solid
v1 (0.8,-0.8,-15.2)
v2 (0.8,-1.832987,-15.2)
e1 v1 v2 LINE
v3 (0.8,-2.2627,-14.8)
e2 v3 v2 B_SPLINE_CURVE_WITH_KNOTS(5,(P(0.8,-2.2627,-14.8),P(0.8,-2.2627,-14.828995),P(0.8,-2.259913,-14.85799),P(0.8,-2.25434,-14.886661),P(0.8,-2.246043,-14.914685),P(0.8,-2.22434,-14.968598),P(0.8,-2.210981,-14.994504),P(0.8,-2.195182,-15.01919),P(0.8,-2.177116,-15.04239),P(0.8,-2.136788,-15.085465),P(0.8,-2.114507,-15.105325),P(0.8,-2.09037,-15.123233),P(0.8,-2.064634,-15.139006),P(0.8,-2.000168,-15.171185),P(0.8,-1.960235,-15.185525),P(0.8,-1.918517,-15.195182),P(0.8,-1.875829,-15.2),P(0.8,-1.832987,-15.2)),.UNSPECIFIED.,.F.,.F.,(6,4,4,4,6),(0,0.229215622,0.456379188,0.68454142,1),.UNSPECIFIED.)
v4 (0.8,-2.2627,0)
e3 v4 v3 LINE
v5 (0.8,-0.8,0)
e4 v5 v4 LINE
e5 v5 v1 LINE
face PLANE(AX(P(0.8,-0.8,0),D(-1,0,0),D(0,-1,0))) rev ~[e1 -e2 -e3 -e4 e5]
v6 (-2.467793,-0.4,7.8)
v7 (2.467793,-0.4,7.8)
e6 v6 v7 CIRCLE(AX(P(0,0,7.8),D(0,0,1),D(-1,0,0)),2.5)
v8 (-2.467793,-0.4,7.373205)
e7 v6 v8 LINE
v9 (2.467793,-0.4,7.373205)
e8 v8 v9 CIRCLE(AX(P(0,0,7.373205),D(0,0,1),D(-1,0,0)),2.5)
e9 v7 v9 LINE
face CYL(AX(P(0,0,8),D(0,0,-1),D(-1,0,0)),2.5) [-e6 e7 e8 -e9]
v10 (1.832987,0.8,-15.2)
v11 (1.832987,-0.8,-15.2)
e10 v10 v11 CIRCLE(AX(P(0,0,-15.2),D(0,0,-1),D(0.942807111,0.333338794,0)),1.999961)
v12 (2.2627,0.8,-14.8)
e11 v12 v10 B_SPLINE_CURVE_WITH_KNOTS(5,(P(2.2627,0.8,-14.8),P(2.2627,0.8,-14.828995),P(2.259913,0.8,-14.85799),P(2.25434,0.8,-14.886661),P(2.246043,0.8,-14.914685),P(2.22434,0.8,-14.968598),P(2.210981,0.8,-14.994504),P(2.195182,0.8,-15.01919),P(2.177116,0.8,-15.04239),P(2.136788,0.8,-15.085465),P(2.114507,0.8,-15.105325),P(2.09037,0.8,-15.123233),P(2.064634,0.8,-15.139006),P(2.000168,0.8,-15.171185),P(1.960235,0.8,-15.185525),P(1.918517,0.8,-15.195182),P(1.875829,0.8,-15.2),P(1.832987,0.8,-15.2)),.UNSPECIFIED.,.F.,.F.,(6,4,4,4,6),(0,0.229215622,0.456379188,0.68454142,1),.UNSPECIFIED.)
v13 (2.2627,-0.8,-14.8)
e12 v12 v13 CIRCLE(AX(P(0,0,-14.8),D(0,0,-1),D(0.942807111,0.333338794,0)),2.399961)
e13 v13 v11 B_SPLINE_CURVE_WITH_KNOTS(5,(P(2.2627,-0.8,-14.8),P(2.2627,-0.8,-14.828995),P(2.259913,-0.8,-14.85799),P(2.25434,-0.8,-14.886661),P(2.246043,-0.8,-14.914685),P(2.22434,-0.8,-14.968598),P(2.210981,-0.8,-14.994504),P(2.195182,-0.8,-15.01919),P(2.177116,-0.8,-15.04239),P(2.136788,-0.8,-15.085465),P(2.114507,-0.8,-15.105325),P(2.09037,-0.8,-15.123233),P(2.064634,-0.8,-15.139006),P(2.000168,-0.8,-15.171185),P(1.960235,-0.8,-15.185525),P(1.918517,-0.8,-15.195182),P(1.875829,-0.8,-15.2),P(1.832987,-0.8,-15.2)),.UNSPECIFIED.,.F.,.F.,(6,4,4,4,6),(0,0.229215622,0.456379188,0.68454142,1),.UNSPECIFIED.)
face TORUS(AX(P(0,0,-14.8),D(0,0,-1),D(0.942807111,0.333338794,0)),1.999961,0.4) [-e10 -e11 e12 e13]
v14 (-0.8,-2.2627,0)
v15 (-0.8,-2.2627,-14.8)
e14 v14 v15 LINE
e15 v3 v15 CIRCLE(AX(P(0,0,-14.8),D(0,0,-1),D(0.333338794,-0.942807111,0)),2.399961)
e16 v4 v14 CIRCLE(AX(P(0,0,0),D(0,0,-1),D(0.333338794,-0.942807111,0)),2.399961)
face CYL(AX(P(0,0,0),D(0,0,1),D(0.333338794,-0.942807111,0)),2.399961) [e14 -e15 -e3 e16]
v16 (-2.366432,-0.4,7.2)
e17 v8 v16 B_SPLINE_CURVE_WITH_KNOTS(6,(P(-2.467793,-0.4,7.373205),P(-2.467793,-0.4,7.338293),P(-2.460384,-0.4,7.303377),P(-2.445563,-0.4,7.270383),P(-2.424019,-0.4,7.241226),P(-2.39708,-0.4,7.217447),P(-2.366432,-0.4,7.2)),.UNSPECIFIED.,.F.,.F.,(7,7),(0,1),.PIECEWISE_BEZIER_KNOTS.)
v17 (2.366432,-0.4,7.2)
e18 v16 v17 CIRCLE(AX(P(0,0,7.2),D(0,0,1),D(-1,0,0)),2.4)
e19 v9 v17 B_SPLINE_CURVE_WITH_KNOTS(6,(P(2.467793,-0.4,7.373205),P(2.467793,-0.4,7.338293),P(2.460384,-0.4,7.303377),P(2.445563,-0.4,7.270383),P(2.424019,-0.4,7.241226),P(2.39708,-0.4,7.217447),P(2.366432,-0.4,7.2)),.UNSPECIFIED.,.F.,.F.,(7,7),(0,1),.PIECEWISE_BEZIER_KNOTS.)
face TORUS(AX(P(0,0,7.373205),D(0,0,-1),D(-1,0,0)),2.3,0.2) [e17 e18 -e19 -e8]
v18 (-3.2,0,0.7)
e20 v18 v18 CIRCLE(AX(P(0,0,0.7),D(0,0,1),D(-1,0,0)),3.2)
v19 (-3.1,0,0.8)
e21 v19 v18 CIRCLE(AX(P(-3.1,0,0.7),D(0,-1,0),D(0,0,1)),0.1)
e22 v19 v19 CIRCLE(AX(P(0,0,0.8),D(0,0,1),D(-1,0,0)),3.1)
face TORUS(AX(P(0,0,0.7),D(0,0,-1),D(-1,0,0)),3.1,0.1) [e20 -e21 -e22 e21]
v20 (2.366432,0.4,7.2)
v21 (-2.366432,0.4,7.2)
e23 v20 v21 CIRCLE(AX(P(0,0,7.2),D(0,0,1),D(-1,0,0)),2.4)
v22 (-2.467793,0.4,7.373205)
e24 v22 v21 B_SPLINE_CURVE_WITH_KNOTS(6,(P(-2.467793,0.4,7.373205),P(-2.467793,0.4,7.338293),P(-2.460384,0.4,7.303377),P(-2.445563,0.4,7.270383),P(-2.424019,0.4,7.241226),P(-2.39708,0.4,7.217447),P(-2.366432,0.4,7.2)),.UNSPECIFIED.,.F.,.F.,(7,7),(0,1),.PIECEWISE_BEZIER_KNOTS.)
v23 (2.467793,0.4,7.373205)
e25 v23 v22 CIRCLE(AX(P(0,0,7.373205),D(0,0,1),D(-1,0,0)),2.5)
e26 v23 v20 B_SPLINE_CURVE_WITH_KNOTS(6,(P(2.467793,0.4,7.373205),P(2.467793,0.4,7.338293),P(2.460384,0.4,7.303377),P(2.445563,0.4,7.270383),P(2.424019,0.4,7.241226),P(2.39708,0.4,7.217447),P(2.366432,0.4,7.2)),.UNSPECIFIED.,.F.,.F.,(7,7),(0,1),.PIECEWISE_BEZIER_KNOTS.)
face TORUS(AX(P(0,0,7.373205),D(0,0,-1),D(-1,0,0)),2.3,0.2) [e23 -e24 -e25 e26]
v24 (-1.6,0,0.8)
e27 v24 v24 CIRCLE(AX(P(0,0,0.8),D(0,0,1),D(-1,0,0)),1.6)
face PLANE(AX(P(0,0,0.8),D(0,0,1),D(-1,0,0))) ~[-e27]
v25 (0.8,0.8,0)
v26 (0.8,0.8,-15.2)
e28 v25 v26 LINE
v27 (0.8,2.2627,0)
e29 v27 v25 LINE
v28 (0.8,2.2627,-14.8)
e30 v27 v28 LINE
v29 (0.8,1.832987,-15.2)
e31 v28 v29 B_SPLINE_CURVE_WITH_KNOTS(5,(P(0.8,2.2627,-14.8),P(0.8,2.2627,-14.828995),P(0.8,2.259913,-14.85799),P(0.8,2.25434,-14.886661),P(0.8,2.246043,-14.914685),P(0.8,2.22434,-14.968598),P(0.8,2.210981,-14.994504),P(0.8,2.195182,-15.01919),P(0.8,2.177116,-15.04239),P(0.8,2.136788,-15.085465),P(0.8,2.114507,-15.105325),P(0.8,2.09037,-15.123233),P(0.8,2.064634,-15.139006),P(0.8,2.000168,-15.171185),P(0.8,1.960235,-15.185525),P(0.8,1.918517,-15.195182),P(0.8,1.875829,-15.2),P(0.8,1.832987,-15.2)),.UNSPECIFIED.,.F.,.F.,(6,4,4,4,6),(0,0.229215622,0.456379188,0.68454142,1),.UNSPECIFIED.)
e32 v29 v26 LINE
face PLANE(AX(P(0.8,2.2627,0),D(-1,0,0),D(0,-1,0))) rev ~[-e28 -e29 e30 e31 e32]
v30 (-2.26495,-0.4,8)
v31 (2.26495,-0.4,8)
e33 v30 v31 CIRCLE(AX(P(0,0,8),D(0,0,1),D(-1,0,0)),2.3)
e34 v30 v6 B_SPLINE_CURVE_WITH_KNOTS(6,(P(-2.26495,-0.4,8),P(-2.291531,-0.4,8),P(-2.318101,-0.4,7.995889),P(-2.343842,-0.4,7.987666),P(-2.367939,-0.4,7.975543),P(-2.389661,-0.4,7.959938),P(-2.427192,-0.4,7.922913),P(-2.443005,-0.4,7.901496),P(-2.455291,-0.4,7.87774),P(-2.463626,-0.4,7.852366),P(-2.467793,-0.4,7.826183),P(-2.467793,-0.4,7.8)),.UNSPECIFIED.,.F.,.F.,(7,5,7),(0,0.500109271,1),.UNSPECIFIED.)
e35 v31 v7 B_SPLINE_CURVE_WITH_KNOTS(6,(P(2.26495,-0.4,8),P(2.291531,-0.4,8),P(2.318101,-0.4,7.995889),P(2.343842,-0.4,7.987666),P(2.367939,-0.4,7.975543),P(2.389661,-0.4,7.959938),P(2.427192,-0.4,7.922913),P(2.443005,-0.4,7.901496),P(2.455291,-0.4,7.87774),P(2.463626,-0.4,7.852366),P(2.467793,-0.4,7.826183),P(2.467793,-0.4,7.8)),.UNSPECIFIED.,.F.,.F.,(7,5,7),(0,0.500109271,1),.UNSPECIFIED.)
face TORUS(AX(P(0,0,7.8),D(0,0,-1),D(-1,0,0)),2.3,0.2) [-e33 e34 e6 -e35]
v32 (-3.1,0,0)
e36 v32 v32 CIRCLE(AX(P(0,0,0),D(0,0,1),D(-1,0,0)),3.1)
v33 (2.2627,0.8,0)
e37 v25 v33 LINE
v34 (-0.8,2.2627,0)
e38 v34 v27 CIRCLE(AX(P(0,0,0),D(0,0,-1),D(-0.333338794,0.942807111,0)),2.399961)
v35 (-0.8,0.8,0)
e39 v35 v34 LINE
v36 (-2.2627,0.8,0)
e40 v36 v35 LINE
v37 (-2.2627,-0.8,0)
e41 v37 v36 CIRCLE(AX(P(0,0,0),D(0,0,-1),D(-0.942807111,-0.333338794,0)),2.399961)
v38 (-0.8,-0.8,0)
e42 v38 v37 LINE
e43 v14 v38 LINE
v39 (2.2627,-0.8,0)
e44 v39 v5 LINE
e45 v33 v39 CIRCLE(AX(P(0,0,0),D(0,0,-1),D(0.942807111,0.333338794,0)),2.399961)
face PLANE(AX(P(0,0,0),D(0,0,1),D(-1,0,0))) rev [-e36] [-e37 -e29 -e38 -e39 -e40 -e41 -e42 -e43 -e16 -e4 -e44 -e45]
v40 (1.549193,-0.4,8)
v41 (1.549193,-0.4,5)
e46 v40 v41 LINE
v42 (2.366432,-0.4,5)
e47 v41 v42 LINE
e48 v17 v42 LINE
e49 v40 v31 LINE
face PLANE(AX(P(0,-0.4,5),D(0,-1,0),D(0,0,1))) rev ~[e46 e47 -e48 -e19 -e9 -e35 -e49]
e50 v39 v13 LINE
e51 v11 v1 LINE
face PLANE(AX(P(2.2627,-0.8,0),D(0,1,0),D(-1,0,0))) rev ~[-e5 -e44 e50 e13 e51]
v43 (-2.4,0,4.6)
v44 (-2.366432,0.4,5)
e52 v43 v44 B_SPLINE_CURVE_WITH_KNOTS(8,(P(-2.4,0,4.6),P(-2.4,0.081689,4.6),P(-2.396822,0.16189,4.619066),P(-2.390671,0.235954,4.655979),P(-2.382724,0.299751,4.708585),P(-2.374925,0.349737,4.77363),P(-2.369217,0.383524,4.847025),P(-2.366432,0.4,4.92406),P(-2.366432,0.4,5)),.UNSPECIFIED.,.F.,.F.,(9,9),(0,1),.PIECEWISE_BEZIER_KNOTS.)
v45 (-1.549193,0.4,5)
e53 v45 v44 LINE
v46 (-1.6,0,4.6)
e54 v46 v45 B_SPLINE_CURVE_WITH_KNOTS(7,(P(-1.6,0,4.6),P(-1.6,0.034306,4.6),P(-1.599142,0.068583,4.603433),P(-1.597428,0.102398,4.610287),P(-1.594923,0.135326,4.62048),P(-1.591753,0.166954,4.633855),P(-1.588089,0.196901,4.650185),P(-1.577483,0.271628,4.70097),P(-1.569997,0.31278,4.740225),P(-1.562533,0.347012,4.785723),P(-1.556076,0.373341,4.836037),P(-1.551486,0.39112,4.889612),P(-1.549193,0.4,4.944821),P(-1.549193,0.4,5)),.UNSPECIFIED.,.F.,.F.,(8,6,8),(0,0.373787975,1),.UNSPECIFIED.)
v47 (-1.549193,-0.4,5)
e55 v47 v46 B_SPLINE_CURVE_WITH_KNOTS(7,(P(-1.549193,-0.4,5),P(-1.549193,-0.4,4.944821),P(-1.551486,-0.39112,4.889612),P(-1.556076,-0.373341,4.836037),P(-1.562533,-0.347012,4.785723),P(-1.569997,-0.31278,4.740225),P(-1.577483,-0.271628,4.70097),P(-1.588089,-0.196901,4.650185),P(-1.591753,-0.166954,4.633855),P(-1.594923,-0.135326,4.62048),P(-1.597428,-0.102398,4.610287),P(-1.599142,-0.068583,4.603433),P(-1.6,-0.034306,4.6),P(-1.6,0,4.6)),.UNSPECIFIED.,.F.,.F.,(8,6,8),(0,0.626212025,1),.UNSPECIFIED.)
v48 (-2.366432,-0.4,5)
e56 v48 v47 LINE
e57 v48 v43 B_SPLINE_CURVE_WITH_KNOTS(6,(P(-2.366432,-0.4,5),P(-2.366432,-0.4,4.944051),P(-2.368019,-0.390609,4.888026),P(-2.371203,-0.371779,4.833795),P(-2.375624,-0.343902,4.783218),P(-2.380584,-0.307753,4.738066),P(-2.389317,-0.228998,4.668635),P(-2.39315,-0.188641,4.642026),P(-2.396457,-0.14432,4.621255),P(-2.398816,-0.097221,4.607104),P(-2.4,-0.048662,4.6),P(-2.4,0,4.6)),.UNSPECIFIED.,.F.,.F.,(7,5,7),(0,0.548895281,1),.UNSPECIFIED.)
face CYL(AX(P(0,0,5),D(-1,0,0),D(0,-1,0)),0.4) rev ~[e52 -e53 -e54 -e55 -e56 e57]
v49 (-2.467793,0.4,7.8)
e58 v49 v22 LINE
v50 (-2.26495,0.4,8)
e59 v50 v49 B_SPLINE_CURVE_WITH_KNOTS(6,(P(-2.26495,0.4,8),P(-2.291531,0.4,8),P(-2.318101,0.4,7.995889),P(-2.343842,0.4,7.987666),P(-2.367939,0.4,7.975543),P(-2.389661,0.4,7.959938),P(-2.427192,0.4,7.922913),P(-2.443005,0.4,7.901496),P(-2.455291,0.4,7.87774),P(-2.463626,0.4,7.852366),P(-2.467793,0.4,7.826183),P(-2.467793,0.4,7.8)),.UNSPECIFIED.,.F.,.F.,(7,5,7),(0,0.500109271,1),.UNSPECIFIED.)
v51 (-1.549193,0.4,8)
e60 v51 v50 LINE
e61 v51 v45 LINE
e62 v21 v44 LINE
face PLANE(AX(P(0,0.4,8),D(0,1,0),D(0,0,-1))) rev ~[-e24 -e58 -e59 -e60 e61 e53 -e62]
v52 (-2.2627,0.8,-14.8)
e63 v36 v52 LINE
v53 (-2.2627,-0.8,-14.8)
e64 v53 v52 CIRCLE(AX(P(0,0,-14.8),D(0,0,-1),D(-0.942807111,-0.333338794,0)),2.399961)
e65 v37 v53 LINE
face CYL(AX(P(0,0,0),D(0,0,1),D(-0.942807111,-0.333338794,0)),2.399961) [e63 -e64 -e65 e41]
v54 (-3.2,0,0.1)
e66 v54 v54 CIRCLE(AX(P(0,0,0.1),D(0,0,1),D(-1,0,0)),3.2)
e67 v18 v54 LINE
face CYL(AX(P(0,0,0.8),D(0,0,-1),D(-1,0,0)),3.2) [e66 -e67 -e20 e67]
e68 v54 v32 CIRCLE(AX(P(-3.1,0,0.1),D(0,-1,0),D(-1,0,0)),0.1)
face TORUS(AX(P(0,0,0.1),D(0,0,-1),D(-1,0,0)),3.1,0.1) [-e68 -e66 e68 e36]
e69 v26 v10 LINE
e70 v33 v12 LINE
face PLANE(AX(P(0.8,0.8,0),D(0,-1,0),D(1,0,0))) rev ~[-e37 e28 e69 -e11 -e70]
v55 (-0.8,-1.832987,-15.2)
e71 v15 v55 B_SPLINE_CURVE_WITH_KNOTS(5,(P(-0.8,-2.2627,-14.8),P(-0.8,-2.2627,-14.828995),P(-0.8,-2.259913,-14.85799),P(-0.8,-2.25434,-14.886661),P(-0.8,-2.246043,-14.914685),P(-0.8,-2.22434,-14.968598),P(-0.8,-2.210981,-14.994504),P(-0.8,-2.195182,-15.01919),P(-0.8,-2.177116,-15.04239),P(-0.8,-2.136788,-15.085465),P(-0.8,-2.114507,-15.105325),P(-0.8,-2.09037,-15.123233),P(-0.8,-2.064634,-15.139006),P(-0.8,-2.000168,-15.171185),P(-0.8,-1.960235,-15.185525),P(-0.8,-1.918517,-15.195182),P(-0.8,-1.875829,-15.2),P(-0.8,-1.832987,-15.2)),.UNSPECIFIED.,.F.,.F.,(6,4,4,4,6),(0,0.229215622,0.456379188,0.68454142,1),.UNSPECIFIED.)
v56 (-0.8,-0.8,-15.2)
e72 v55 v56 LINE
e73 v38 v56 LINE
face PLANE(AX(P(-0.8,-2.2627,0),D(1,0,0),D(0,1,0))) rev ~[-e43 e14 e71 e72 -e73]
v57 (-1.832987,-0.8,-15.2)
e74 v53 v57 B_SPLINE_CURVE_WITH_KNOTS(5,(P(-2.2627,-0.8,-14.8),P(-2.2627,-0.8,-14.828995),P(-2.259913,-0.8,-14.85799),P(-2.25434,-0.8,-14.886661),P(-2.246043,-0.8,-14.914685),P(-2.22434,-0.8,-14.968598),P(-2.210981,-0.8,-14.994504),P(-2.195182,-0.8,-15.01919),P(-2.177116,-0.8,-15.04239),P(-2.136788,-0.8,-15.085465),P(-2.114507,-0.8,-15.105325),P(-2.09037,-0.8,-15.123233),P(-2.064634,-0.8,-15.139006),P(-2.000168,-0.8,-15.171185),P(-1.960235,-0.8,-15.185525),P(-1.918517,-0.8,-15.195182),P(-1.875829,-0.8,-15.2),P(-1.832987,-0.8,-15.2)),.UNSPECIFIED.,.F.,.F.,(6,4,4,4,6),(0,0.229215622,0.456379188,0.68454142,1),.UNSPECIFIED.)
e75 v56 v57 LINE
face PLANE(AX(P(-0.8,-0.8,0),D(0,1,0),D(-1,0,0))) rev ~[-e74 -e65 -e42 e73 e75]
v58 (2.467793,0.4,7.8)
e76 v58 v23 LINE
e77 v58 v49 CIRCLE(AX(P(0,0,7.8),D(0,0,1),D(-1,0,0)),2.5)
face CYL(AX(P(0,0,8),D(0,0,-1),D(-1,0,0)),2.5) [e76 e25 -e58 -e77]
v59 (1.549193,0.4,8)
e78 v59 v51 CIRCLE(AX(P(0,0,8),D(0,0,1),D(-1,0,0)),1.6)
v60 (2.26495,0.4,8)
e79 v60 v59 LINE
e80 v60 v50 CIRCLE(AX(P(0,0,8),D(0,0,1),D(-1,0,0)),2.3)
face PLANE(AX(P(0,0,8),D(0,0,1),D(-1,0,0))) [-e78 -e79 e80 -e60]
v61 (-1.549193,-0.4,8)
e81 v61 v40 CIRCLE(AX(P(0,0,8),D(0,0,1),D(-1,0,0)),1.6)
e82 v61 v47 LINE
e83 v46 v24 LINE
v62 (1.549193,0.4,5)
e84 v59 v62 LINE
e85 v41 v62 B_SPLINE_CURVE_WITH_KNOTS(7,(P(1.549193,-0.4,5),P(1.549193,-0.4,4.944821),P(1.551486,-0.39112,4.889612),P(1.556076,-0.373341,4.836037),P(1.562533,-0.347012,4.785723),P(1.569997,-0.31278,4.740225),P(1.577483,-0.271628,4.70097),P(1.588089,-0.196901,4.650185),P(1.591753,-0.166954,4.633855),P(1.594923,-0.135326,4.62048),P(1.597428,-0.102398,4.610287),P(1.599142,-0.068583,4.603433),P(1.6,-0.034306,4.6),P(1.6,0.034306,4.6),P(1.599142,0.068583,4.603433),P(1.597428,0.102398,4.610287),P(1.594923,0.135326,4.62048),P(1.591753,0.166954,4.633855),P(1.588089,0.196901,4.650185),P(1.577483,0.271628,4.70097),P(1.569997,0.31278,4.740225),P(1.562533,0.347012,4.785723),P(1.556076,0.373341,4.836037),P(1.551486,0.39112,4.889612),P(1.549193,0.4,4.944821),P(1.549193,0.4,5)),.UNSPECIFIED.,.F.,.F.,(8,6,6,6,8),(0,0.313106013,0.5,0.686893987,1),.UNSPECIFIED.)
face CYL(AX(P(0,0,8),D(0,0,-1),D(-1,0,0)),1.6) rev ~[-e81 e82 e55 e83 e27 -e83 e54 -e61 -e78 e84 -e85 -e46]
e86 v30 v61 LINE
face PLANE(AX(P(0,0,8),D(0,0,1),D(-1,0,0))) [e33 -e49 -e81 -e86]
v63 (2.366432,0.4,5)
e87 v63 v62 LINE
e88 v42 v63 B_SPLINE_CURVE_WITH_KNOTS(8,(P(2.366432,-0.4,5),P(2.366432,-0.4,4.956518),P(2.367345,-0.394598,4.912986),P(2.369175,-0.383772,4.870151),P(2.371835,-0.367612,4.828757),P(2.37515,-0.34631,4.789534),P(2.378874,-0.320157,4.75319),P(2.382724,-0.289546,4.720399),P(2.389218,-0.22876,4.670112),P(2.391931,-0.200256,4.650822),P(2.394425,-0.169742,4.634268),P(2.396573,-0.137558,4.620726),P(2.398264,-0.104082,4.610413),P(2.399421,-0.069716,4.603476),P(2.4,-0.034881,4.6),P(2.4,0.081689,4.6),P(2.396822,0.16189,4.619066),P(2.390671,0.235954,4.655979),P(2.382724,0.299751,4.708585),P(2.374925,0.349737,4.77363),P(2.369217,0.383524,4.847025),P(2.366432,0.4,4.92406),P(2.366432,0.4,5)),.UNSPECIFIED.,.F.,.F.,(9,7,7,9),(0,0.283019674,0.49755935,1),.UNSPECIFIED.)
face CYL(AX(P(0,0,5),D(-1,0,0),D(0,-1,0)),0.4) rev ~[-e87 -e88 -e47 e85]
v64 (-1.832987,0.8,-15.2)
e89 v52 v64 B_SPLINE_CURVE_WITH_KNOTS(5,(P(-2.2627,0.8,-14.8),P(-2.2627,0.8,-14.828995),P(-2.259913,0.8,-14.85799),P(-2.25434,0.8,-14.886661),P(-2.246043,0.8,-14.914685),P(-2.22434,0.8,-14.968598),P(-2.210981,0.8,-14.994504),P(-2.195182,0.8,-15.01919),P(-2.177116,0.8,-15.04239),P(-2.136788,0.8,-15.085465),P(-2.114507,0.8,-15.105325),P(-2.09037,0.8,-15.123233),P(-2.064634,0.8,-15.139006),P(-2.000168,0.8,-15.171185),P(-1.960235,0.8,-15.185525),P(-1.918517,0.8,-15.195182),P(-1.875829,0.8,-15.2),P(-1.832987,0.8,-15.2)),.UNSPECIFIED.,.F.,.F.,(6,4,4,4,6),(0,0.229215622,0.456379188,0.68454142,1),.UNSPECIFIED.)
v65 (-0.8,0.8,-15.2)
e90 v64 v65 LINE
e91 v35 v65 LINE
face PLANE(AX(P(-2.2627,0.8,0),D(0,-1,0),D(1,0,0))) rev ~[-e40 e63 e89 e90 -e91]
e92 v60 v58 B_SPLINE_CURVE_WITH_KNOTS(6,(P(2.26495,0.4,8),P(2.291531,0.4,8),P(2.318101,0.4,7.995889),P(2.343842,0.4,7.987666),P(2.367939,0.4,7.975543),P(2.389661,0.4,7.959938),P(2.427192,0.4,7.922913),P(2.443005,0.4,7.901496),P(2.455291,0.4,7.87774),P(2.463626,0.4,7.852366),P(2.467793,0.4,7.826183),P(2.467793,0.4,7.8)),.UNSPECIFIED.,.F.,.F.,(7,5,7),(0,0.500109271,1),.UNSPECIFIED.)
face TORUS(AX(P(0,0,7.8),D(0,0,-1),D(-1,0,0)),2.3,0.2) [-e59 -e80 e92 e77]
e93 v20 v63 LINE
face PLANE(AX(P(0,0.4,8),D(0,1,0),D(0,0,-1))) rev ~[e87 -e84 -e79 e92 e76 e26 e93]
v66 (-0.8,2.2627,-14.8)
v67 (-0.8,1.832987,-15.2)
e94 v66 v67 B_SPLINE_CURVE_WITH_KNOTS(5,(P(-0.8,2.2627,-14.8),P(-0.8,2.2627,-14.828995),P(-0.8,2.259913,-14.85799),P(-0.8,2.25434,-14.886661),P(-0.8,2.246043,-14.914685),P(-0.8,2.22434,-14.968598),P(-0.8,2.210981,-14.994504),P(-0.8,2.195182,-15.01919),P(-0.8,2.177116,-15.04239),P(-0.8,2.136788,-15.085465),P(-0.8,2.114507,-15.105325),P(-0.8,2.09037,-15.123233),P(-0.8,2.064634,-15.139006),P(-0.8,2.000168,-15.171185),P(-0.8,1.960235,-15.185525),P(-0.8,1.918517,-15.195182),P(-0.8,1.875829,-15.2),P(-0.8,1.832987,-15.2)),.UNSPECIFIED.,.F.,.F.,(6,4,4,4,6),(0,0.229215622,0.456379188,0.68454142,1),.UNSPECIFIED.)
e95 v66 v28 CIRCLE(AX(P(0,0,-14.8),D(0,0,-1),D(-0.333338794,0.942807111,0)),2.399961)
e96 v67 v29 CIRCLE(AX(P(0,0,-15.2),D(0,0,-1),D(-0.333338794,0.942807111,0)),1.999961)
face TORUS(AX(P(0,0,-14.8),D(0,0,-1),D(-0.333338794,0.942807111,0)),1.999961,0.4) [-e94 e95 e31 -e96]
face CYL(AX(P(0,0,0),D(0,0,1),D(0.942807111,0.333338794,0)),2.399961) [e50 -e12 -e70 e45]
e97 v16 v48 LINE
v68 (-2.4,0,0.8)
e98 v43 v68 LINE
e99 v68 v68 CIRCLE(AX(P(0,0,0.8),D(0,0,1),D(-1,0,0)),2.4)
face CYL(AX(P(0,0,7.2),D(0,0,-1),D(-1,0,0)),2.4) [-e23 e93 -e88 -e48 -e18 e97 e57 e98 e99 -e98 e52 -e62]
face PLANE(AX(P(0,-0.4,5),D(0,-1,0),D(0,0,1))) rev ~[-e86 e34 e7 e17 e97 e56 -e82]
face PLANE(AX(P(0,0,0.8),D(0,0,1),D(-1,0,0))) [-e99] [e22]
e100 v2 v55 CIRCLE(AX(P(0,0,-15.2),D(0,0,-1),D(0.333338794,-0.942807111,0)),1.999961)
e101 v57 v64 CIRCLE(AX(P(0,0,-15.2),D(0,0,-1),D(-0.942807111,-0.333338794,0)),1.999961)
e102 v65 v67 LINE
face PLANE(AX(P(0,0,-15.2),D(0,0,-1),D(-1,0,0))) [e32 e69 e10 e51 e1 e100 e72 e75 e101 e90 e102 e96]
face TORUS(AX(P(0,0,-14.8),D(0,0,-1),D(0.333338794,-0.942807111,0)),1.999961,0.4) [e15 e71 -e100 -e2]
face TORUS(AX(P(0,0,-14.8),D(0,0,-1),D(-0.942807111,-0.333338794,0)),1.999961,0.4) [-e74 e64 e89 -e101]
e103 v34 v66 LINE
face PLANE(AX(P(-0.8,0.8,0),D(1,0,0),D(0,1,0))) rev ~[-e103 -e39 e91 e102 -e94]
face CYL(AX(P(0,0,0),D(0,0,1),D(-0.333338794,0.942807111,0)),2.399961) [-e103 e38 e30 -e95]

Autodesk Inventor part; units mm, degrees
ref_plane "YZ Plane" through (0, 0, 0) normal (1, 0, 0) x (0, 1, 0)
ref_plane "XZ Plane" through (0, 0, 0) normal (0, 1, 0) x (-1, 0, 0)
ref_plane "XY Plane" through (0, 0, 0) normal (0, 0, 1) x (1, 0, 0)
sketch "Sketch1" plane through (0, 0, 0) normal (0, 1, 0) x (-1, 0, 0)
  line L0 (2.4, 7.2) -> (2.4, 0.8)
  line L1 (3.2, 0.8) -> (2.4, 0.8)
  line L2 (3.2, 0.8) -> (3.2, 0)
  line L3 (0, 0) -> (3.2, 0)
  line L4 (2.5, 8) -> (2.5, 7.2)
  line L5 (2.5, 8) -> (1.6, 8)
  line L6 (0, -1.6) -> (0, 9.6) projected
  line L7 (2.4, 7.2) -> (2.5, 7.2)
  line L8 (3.72, 0) -> (-0.62, 0) projected
  line L9 (0, 0) -> (0, 0.8)
  line L10 (0, 0.8) -> (1.6, 0.8)
  line L11 (1.6, 8) -> (1.6, 0.8)
  dimension "d1" = 4.8
  dimension "d2" = 5
  dimension "d7" = 0.8
  dimension "d8" = 6.4
  dimension "d9" = 0.8
  dimension "d40" = 3.2
  dimension "d44" = 0
  dimension "d46" = 8
revolve "Revolution1" add sketch "Sketch1" angle 360 about axis through (0, 0, -10) along (0, 0, 1)
fillet "Fillet1" radius 0.2 2 edges at (2.5, 0, 8) (2.5, 0, 7.2)
fillet "Fillet1" radius 0.1 2 edges at (3.2, 0, 0.8) (3.2, 0, 0)
sketch "Sketch2" plane through (0, 0, 0) normal (1, 0, 0) x (0, 1, 0)
  line L0 (-1.6, 8) -> (1.6, 8) projected
  line L1 (-0.4, 8) -> (0.4, 8)
  line L2 (0.4, 8) -> (0.4, 5)
  line L3 (-0.4, 5) -> (-0.4, 8)
  arc A0 (-0.4, 5) -> (0.4, 5) centre (0, 5) ccw
  point P0 (0, 0)
  point P1 (0, 8)
  dimension "d34" = 3.4
  dimension "d41" = 0.8
extrude "Extrusion2" cut sketch "Sketch2" along normal through all both and the other way through all
sketch "Sketch3" plane through (0, 0, 0) normal (0, 0, -1) x (-1, 0, 0)
  circle A0 centre (0, 0) radius 3.1 projected
  circle A1 centre (0, 0) radius 2.4 construction
  line L0 (-0.8, 2.2627) -> (-0.8, 0.8)
  line L1 (-0.8, 0.8) -> (-2.2627, 0.8)
  line L2 (-2.2627, -0.8) -> (-0.8, -0.8)
  line L3 (-0.8, -0.8) -> (-0.8, -2.2627)
  line L4 (0.8, -2.2627) -> (0.8, -0.8)
  line L5 (0.8, -0.8) -> (2.2627, -0.8)
  line L6 (2.2627, 0.8) -> (0.8, 0.8)
  line L7 (0.8, 0.8) -> (0.8, 2.2627)
  arc A2 (0.8, 2.2627) -> (-0.8, 2.2627) centre (0, 0) ccw
  arc A3 (-2.2627, 0.8) -> (-2.2627, -0.8) centre (0, 0) ccw
  arc A4 (-0.8, -2.2627) -> (0.8, -2.2627) centre (0, 0) ccw
  arc A5 (2.2627, -0.8) -> (2.2627, 0.8) centre (0, 0) ccw
  dimension "d35" = 4.8
  dimension "d36" = 1.6
extrude "Extrusion3" add sketch "Sketch3" along normal blind 15.2 contours A2 L7 L6 A5 L5 L4 A4 L3 L2 A3 L1 L0
fillet "Fillet2" radius 0.4 4 edges at (0, 2.4, -15.2) (2.4, 0, -15.2) (0, -2.4, -15.2) (-2.4, 0, -15.2)
equation "\"d1\" = tpd"
equation "\"d2\" = tpcd"
equation "\"d7\" = d9"
equation "\"d8\" = tsd"
equation "\"d9\" = tsl"
equation "\"d40\" = rd"
equation "\"d46\" = lu"
equation "\"d27\" = pinf"
equation "\"d28\" = lf"
equation "\"d34\" = tpnl"
equation "\"d41\" = tpnw"
equation "\"d35\" = kd"
equation "\"d36\" = axlet"
equation "\"d37\" = 2 * lu - tsl"
equation "\"d39\" = tf"
equation "\"tpd\" = 4.8"
equation "\"tpcd\" = 5"
equation "\"tsd\" = 6.4"
equation "\"tsl\" = 0.8"
equation "\"rd\" = 3.2"
equation "\"lu\" = 8"
equation "\"pinf\" = 0.2"
equation "\"lf\" = 0.1"
equation "\"tpnl\" = 3.4"
equation "\"tpnw\" = 0.8"
equation "\"kd\" = 4.8"
equation "\"axlet\" = 1.6"
equation "\"tf\" = 0.4"
properties part number "18651-Black" material "ABS Plastic"
